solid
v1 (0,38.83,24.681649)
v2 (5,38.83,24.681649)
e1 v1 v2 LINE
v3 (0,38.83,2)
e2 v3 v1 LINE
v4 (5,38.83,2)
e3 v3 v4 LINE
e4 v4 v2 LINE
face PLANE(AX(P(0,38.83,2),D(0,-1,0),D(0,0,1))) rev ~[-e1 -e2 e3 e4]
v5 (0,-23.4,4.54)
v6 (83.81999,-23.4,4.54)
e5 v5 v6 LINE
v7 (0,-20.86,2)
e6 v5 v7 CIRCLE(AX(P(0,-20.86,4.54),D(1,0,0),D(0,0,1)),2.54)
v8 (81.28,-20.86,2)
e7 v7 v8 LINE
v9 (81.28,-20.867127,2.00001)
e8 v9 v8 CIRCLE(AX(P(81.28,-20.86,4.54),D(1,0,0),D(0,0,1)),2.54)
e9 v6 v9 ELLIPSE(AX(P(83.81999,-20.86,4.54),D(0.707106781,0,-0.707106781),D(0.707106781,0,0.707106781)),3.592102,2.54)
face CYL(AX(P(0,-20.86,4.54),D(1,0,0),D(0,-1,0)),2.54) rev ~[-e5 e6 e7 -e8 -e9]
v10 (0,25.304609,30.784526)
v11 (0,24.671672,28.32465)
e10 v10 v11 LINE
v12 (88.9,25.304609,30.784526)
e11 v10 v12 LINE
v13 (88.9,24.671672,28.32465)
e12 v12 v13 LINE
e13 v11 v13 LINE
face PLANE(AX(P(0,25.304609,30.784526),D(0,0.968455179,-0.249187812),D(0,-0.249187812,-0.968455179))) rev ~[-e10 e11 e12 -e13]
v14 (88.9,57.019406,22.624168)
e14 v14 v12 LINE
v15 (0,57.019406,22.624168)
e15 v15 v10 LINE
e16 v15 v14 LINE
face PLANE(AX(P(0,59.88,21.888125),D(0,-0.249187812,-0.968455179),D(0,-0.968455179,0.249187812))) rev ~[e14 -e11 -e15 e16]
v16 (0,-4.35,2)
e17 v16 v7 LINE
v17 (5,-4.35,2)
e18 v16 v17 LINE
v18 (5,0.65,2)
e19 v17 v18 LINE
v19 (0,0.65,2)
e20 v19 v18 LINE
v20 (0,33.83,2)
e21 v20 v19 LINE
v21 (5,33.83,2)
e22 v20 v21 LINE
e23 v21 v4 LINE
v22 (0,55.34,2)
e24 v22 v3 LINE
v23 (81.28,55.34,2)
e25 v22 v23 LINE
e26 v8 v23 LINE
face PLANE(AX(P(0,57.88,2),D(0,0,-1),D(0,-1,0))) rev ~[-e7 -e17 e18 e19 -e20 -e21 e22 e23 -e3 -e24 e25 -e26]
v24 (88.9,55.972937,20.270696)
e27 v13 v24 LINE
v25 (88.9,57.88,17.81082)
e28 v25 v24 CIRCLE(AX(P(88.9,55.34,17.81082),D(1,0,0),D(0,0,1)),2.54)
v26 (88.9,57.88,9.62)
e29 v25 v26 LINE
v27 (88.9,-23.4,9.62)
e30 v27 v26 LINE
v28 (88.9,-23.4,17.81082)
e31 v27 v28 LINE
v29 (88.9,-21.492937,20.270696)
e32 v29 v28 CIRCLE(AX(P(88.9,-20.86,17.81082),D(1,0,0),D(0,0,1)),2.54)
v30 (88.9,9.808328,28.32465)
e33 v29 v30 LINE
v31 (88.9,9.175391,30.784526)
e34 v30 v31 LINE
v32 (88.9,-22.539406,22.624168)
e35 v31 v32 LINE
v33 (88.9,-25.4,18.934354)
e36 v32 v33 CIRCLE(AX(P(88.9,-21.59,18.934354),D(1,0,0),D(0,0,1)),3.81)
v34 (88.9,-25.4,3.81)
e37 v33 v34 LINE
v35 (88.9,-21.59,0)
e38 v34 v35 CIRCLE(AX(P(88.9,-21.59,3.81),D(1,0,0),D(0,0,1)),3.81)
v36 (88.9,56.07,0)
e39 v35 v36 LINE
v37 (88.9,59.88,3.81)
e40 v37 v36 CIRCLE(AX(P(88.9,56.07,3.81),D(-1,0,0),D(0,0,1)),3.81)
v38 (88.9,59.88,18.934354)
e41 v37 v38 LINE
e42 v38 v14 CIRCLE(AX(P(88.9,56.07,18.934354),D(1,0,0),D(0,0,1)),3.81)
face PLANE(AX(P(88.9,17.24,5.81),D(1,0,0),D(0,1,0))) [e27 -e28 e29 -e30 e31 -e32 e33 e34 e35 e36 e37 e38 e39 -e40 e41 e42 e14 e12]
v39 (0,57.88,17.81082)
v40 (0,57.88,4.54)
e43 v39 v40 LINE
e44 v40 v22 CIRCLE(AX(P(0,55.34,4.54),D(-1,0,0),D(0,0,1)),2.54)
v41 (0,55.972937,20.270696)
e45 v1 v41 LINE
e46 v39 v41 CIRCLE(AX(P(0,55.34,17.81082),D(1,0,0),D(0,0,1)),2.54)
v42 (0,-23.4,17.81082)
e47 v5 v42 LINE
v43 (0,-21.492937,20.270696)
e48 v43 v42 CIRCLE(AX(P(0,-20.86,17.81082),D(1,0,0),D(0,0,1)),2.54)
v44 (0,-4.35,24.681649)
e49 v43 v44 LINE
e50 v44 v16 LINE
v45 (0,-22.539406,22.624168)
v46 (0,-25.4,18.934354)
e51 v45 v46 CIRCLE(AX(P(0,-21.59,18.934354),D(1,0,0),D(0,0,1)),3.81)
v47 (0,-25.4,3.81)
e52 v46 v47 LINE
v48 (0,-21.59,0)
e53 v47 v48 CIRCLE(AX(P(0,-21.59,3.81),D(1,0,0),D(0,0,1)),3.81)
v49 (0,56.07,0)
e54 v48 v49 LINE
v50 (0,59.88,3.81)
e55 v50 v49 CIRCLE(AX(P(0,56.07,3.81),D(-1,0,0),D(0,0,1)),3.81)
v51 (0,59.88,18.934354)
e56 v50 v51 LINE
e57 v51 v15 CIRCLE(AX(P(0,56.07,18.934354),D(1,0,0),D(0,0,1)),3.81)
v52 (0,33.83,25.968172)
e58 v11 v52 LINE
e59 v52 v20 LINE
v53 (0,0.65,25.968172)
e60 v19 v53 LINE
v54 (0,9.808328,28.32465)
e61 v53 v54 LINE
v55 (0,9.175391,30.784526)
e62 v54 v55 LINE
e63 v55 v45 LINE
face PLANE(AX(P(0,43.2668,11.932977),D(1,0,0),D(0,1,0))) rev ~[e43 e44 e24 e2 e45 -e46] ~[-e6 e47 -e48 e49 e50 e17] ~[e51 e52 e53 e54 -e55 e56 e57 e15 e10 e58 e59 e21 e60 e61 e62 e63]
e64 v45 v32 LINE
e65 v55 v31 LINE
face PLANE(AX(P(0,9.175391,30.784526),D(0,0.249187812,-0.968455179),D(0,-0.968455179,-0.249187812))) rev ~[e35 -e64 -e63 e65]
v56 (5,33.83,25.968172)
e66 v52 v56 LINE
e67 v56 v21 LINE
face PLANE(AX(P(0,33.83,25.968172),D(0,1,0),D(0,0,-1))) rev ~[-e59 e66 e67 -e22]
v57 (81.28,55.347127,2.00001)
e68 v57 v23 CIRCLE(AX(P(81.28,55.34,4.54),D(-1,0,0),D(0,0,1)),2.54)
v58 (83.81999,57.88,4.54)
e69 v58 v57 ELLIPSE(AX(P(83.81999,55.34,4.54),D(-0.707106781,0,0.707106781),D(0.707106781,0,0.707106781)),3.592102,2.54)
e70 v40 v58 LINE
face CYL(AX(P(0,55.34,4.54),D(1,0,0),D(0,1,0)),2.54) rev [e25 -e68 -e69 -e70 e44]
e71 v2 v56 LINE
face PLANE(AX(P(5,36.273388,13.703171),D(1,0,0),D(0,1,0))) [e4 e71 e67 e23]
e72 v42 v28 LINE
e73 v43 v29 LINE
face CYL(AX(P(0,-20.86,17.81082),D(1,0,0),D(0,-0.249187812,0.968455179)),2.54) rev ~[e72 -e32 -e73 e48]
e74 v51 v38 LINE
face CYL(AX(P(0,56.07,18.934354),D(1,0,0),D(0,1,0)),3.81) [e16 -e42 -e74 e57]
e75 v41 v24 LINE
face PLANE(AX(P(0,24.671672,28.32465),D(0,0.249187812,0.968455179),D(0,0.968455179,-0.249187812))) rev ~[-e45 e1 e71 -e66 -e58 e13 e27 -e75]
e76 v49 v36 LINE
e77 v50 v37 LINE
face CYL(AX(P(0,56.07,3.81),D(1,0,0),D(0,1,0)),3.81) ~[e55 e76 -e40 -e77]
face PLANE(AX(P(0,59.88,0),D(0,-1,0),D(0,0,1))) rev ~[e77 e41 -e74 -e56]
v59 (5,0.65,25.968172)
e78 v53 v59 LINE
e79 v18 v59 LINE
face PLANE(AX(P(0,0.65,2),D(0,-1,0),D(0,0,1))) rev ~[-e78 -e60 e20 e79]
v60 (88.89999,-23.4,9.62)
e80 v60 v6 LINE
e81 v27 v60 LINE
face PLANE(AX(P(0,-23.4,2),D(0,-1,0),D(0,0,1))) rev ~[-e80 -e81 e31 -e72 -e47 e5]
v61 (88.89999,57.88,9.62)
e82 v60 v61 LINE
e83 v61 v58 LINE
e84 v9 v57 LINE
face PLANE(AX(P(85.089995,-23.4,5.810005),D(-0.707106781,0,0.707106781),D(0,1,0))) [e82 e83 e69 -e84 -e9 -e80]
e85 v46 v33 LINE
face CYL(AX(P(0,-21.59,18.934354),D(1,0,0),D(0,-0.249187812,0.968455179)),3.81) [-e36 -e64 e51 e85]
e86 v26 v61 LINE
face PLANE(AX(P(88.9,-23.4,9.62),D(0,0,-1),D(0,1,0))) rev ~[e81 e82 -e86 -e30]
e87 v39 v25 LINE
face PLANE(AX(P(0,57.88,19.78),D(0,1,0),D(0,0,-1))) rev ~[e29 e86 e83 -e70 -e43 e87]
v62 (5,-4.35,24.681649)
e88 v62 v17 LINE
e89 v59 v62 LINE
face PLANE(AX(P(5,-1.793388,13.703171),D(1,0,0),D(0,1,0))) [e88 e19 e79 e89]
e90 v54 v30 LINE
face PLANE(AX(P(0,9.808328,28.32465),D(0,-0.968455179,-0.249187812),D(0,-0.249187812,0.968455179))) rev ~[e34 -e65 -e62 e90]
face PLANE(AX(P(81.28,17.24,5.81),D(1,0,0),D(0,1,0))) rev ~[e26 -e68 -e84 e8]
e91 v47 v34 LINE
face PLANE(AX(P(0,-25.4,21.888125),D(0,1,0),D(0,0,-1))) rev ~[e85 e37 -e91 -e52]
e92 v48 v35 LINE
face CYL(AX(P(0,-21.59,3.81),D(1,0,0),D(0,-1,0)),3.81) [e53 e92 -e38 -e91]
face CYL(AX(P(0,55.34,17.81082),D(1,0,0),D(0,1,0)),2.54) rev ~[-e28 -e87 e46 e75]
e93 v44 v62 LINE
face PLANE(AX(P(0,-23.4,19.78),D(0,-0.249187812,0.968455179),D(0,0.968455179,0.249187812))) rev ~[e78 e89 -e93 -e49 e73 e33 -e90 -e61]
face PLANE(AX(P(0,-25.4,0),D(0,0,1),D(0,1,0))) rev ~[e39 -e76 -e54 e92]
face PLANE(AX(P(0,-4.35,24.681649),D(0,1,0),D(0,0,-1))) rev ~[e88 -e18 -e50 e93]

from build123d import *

# Parameters (mm, degrees)
F1_DEPTH = 88.9
F3_DEPTH = 5
F4_W     = 81.28
F4_H     = 7.62
F5_DEPTH = 7.62
F6_R     = 3.81
F7_R     = 2.54
F8_SIZE  = 7.61999


# Not quite as in the source:
# - a fillet or chamfer is up to 0.001 mm smaller than in the source, because OpenCascade refuses the exact size


with BuildPart() as f1:
    # F0 (on Right) → F1 (new body)
    with BuildSketch(Plane.YZ):
        Polygon((17.24, 2), (17.24, 0), (59.88, 0), (59.88, 21.8881247946), (25.3046089437, 30.7845262293), (24.6716719012, 28.3246500739), (57.88, 19.78), (57.88, 2), align=None)
        Polygon((-25.4, 21.8881247946), (-25.4, 0), (17.24, 0), (17.24, 2), (-23.4, 2), (-23.4, 19.78), (9.8083280988, 28.3246500739), (9.1753910563, 30.7845262293), align=None)
    extrude(amount=F1_DEPTH)

    # F2 (on Right) → F3 (join)
    with BuildSketch(Plane.YZ):
        Polygon((33.83, 2), (38.83, 2), (38.83, 17.7), (38.83, 24.6816494725), (33.83, 25.9681716437), (33.83, 17.7), align=None)
        Polygon((-4.35, 17.7), (-4.35, 2), (0.65, 2), (0.65, 17.7), (0.65, 25.9681716437), (-4.35, 24.6816494725), align=None)
    extrude(amount=F3_DEPTH)

    # F4 (on face) → F5 (join)
    with BuildSketch(Plane.YZ.offset(88.9)):
        with Locations((17.24, 5.81)):
            Rectangle(F4_W, F4_H)
    extrude(amount=-F5_DEPTH)

    # F6
    f6_edges = [f1.edges().sort_by_distance(p)[0] for p in [
        (44.45, -25.4, 0),
        (44.45, 59.88, 0),
        (44.45, -25.4, 21.888125),
        (44.45, 59.88, 21.888125),
    ]]
    fillet(f6_edges, radius=F6_R)

    # F7
    f7_edges = [f1.edges().sort_by_distance(p)[0] for p in [
        (40.64, 57.88, 2),
        (40.64, -23.4, 2),
        (44.45, -23.4, 19.78),
        (44.45, 57.88, 19.78),
    ]]
    fillet(f7_edges, radius=F7_R)

    # F8 (size 7.62 in the source; OpenCascade refuses exactly that, so slightly less here)
    f8_edges = [f1.edges().sort_by_distance(p)[0] for p in [
        (81.28, 17.24, 9.62),
    ]]
    chamfer(f8_edges, length=F8_SIZE)


solid = f1.part
